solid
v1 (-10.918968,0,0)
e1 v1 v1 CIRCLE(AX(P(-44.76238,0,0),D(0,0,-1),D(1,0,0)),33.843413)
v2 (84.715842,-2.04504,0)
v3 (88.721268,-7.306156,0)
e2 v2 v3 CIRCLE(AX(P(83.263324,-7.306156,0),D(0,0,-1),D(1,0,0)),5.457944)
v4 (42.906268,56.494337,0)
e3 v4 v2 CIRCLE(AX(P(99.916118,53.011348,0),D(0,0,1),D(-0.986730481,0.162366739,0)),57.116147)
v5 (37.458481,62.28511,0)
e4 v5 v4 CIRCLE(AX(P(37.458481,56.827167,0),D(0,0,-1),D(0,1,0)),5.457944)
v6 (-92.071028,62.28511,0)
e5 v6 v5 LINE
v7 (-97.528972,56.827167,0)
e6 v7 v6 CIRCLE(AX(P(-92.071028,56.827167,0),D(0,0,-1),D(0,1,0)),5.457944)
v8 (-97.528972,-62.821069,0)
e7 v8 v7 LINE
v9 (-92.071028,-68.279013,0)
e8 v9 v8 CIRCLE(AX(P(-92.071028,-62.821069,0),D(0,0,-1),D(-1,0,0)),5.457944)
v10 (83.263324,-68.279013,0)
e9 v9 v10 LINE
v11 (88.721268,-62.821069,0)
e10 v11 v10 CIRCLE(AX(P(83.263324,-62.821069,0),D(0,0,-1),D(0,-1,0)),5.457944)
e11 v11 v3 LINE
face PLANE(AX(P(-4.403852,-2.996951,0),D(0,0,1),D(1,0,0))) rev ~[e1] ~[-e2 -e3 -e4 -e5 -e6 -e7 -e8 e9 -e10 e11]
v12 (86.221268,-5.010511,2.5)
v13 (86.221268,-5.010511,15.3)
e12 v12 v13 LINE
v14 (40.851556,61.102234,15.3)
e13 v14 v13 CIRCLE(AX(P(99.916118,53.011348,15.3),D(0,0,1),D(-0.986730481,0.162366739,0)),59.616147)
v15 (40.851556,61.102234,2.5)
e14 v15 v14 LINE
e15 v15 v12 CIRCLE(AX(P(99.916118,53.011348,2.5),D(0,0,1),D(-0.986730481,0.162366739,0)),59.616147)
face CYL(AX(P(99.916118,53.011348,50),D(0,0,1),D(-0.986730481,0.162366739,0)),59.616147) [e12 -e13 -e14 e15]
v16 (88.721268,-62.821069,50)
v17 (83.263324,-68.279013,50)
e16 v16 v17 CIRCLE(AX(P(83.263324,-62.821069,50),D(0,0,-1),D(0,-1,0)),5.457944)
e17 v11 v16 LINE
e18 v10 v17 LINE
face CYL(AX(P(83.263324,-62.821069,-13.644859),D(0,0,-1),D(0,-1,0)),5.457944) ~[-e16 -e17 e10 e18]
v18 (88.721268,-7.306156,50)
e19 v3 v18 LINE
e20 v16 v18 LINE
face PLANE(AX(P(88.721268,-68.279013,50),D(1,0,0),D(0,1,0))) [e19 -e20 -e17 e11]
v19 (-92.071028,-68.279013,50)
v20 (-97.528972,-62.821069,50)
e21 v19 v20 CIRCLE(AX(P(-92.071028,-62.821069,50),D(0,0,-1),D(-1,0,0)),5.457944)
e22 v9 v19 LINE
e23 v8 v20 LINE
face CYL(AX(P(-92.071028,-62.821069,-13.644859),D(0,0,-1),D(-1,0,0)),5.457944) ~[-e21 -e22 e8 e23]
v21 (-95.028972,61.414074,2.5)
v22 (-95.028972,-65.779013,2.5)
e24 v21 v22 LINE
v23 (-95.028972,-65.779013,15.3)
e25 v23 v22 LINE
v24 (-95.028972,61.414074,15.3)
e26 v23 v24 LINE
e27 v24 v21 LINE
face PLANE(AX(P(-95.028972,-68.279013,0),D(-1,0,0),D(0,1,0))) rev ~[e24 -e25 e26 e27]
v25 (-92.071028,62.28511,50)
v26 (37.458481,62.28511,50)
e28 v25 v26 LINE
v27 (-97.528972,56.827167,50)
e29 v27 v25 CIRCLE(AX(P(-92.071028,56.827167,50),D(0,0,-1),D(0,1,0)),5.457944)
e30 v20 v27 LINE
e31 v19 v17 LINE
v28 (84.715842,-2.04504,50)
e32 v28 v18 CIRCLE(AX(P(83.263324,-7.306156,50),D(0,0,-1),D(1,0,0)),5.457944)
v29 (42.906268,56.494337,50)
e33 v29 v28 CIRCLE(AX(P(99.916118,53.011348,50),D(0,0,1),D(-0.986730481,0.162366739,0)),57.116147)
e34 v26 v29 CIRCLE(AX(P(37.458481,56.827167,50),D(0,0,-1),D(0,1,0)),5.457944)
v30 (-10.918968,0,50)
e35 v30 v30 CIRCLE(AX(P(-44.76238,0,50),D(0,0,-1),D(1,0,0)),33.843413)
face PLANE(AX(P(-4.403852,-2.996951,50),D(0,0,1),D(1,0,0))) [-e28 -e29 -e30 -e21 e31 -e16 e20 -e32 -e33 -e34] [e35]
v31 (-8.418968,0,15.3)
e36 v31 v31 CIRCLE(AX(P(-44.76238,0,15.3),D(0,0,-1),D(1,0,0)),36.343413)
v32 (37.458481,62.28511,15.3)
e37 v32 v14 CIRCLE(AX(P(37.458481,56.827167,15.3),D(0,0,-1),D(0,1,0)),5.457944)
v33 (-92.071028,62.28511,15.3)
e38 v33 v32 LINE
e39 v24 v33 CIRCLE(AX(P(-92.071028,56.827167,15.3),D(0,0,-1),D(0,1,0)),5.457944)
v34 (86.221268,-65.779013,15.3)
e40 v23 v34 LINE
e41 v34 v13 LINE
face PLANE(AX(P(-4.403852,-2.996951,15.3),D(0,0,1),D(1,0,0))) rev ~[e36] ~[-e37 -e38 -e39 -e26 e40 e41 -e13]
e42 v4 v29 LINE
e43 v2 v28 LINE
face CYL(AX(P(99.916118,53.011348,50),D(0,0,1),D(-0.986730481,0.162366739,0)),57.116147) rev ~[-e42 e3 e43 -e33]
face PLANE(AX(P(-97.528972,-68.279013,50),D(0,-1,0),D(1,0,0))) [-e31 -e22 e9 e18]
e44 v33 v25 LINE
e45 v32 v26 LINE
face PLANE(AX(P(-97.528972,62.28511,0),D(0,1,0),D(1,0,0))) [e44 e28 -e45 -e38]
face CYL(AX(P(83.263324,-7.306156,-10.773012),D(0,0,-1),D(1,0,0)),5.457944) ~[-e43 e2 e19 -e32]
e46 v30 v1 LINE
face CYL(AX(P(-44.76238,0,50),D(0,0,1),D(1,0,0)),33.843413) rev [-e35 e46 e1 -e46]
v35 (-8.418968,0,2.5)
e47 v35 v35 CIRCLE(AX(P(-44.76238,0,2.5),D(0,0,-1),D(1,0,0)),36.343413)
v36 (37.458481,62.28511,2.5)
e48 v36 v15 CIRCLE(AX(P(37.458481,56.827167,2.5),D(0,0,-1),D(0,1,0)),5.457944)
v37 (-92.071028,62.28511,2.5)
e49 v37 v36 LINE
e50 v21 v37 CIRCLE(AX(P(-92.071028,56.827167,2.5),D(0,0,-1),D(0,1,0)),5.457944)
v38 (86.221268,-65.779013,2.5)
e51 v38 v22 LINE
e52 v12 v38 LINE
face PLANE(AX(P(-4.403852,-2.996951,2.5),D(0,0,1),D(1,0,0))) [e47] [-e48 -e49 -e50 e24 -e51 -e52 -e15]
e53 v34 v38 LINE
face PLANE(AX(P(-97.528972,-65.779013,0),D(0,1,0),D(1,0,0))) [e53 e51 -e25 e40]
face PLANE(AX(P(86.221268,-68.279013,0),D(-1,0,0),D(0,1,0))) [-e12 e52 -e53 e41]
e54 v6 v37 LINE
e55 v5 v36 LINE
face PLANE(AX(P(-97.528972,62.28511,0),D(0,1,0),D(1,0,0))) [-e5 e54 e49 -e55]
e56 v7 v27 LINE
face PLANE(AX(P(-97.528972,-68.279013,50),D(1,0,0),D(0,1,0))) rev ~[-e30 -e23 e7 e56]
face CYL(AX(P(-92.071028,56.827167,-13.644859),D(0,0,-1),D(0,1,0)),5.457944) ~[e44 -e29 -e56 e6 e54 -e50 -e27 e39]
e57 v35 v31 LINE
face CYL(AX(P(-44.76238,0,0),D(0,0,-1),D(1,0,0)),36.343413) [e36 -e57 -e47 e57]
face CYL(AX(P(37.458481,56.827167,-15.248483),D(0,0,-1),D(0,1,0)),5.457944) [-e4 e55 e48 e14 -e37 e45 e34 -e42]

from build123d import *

# Parameters (mm, degrees)
F0_W        = 186.2502396107
F0_H        = 130.5641233921
F1_DEPTH    = 50
F2_R        = 33.843412588
F3_DEPTH    = 153
F5_DEPTH    = 98
F6_T        = -2.5
F7_DEPTH    = 34.7
F8_T1_DEPTH = 77.2897189396
F8_T3_DEPTH = 80.4969668156
F8_T5_DEPTH = 71.5460241694


# Not quite as in the source:
# - a fillet or chamfer that OpenCascade refuses, or shapes differently, is made with other operations: its cross-section is extruded or revolved along the edge and cut away or added


with BuildPart() as f1:
    # F0 (on Top) → F1 (new body)
    with BuildSketch(Plane.XY):
        with Locations((-4.4038519263, -2.9969513416)):
            Rectangle(F0_W, F0_H)
    extrude(amount=F1_DEPTH)

    # F2 (on face) → F3 (cut)
    with BuildSketch(Plane(origin=(0, 0, 0), x_dir=(1, 0, 0), z_dir=(0, 0, -1))):
        with Locations((-44.7623804212, 0)):
            Circle(F2_R)
    extrude(amount=-F3_DEPTH, mode=Mode.SUBTRACT)

    # F4 (on face) → F5 (cut)
    with BuildSketch(Plane.XY.offset(50)):
        with BuildLine():
            Line((88.721267879, 62.2851103544), (43.5578748584, 62.2851103544))
            ThreePointArc((43.5578748584, 62.2851103544), (52.9449353899, 20.5157751148), (88.721267879, -2.9969513416))
            Line((88.721267879, -2.9969513416), (88.721267879, 62.2851103544))
        make_face()
    extrude(amount=-F5_DEPTH, mode=Mode.SUBTRACT)

    # F6
    f6_openings = [f1.faces().sort_by_distance(p)[0] for p in [
        (-26.985548, 62.28511, 25),
    ]]
    offset(amount=F6_T, openings=f6_openings)

    # F7 (add): a face of the model
    f7_faces = [f1.faces().sort_by_distance(p)[0] for p in [
        (-5.8734353471, -8.457374128, 50),
    ]]
    extrude(f7_faces, amount=-F7_DEPTH)

    # F8: fillet of radius 5.4579437879 on 5 edges, made by hand

    # F8_s2 → F8_t1 (cut)
    with BuildSketch(Plane.XY.offset(-13.6448594698)):
        with BuildLine():
            ThreePointArc((-97.5289717317, -62.8210692498), (-95.9303770075, -66.6804183135), (-92.0710279438, -68.2790130377))
            Line((-92.0710279438, -68.2790130377), (-97.5289717317, -68.2790130377))
            Line((-97.5289717317, -68.2790130377), (-97.5289717317, -62.8210692498))
        make_face()
        with BuildLine():
            ThreePointArc((83.2633240911, -68.2790130377), (87.1226731549, -66.6804183135), (88.721267879, -62.8210692498))
            Line((88.721267879, -62.8210692498), (88.721267879, -68.2790130377))
            Line((88.721267879, -68.2790130377), (83.2633240911, -68.2790130377))
        make_face()
        with BuildLine():
            ThreePointArc((-92.0710279438, 62.2851103544), (-95.9303770075, 60.6865156303), (-97.5289717317, 56.8271665665))
            Line((-97.5289717317, 56.8271665665), (-97.5289717317, 62.2851103544))
            Line((-97.5289717317, 62.2851103544), (-92.0710279438, 62.2851103544))
        make_face()
    extrude(amount=F8_T1_DEPTH, mode=Mode.SUBTRACT)

    # F8_s4 → F8_t3 (cut)
    with BuildSketch(Plane.XY.offset(-15.2484834078)):
        with BuildLine():
            ThreePointArc((37.4584814953, 62.2851103544), (41.4337624229, 60.5669916879), (42.9062677149, 56.4943367342))
            ThreePointArc((42.9062677149, 56.4943367342), (43.1581721547, 59.3980390485), (43.5578748584, 62.2851103544))
            Line((43.5578748584, 62.2851103544), (37.4584814953, 62.2851103544))
        make_face()
    extrude(amount=F8_T3_DEPTH, mode=Mode.SUBTRACT)

    # F8_s6 → F8_t5 (cut)
    with BuildSketch(Plane.XY.offset(-10.7730120847)):
        with BuildLine():
            ThreePointArc((88.721267879, -7.3061561755), (87.605956573, -3.99999624), (84.7158424133, -2.0450402373))
            ThreePointArc((84.7158424133, -2.0450402373), (86.7099755288, -2.557096868), (88.721267879, -2.9969513416))
            Line((88.721267879, -2.9969513416), (88.721267879, -7.3061561755))
        make_face()
    extrude(amount=F8_T5_DEPTH, mode=Mode.SUBTRACT)


solid = f1.part
